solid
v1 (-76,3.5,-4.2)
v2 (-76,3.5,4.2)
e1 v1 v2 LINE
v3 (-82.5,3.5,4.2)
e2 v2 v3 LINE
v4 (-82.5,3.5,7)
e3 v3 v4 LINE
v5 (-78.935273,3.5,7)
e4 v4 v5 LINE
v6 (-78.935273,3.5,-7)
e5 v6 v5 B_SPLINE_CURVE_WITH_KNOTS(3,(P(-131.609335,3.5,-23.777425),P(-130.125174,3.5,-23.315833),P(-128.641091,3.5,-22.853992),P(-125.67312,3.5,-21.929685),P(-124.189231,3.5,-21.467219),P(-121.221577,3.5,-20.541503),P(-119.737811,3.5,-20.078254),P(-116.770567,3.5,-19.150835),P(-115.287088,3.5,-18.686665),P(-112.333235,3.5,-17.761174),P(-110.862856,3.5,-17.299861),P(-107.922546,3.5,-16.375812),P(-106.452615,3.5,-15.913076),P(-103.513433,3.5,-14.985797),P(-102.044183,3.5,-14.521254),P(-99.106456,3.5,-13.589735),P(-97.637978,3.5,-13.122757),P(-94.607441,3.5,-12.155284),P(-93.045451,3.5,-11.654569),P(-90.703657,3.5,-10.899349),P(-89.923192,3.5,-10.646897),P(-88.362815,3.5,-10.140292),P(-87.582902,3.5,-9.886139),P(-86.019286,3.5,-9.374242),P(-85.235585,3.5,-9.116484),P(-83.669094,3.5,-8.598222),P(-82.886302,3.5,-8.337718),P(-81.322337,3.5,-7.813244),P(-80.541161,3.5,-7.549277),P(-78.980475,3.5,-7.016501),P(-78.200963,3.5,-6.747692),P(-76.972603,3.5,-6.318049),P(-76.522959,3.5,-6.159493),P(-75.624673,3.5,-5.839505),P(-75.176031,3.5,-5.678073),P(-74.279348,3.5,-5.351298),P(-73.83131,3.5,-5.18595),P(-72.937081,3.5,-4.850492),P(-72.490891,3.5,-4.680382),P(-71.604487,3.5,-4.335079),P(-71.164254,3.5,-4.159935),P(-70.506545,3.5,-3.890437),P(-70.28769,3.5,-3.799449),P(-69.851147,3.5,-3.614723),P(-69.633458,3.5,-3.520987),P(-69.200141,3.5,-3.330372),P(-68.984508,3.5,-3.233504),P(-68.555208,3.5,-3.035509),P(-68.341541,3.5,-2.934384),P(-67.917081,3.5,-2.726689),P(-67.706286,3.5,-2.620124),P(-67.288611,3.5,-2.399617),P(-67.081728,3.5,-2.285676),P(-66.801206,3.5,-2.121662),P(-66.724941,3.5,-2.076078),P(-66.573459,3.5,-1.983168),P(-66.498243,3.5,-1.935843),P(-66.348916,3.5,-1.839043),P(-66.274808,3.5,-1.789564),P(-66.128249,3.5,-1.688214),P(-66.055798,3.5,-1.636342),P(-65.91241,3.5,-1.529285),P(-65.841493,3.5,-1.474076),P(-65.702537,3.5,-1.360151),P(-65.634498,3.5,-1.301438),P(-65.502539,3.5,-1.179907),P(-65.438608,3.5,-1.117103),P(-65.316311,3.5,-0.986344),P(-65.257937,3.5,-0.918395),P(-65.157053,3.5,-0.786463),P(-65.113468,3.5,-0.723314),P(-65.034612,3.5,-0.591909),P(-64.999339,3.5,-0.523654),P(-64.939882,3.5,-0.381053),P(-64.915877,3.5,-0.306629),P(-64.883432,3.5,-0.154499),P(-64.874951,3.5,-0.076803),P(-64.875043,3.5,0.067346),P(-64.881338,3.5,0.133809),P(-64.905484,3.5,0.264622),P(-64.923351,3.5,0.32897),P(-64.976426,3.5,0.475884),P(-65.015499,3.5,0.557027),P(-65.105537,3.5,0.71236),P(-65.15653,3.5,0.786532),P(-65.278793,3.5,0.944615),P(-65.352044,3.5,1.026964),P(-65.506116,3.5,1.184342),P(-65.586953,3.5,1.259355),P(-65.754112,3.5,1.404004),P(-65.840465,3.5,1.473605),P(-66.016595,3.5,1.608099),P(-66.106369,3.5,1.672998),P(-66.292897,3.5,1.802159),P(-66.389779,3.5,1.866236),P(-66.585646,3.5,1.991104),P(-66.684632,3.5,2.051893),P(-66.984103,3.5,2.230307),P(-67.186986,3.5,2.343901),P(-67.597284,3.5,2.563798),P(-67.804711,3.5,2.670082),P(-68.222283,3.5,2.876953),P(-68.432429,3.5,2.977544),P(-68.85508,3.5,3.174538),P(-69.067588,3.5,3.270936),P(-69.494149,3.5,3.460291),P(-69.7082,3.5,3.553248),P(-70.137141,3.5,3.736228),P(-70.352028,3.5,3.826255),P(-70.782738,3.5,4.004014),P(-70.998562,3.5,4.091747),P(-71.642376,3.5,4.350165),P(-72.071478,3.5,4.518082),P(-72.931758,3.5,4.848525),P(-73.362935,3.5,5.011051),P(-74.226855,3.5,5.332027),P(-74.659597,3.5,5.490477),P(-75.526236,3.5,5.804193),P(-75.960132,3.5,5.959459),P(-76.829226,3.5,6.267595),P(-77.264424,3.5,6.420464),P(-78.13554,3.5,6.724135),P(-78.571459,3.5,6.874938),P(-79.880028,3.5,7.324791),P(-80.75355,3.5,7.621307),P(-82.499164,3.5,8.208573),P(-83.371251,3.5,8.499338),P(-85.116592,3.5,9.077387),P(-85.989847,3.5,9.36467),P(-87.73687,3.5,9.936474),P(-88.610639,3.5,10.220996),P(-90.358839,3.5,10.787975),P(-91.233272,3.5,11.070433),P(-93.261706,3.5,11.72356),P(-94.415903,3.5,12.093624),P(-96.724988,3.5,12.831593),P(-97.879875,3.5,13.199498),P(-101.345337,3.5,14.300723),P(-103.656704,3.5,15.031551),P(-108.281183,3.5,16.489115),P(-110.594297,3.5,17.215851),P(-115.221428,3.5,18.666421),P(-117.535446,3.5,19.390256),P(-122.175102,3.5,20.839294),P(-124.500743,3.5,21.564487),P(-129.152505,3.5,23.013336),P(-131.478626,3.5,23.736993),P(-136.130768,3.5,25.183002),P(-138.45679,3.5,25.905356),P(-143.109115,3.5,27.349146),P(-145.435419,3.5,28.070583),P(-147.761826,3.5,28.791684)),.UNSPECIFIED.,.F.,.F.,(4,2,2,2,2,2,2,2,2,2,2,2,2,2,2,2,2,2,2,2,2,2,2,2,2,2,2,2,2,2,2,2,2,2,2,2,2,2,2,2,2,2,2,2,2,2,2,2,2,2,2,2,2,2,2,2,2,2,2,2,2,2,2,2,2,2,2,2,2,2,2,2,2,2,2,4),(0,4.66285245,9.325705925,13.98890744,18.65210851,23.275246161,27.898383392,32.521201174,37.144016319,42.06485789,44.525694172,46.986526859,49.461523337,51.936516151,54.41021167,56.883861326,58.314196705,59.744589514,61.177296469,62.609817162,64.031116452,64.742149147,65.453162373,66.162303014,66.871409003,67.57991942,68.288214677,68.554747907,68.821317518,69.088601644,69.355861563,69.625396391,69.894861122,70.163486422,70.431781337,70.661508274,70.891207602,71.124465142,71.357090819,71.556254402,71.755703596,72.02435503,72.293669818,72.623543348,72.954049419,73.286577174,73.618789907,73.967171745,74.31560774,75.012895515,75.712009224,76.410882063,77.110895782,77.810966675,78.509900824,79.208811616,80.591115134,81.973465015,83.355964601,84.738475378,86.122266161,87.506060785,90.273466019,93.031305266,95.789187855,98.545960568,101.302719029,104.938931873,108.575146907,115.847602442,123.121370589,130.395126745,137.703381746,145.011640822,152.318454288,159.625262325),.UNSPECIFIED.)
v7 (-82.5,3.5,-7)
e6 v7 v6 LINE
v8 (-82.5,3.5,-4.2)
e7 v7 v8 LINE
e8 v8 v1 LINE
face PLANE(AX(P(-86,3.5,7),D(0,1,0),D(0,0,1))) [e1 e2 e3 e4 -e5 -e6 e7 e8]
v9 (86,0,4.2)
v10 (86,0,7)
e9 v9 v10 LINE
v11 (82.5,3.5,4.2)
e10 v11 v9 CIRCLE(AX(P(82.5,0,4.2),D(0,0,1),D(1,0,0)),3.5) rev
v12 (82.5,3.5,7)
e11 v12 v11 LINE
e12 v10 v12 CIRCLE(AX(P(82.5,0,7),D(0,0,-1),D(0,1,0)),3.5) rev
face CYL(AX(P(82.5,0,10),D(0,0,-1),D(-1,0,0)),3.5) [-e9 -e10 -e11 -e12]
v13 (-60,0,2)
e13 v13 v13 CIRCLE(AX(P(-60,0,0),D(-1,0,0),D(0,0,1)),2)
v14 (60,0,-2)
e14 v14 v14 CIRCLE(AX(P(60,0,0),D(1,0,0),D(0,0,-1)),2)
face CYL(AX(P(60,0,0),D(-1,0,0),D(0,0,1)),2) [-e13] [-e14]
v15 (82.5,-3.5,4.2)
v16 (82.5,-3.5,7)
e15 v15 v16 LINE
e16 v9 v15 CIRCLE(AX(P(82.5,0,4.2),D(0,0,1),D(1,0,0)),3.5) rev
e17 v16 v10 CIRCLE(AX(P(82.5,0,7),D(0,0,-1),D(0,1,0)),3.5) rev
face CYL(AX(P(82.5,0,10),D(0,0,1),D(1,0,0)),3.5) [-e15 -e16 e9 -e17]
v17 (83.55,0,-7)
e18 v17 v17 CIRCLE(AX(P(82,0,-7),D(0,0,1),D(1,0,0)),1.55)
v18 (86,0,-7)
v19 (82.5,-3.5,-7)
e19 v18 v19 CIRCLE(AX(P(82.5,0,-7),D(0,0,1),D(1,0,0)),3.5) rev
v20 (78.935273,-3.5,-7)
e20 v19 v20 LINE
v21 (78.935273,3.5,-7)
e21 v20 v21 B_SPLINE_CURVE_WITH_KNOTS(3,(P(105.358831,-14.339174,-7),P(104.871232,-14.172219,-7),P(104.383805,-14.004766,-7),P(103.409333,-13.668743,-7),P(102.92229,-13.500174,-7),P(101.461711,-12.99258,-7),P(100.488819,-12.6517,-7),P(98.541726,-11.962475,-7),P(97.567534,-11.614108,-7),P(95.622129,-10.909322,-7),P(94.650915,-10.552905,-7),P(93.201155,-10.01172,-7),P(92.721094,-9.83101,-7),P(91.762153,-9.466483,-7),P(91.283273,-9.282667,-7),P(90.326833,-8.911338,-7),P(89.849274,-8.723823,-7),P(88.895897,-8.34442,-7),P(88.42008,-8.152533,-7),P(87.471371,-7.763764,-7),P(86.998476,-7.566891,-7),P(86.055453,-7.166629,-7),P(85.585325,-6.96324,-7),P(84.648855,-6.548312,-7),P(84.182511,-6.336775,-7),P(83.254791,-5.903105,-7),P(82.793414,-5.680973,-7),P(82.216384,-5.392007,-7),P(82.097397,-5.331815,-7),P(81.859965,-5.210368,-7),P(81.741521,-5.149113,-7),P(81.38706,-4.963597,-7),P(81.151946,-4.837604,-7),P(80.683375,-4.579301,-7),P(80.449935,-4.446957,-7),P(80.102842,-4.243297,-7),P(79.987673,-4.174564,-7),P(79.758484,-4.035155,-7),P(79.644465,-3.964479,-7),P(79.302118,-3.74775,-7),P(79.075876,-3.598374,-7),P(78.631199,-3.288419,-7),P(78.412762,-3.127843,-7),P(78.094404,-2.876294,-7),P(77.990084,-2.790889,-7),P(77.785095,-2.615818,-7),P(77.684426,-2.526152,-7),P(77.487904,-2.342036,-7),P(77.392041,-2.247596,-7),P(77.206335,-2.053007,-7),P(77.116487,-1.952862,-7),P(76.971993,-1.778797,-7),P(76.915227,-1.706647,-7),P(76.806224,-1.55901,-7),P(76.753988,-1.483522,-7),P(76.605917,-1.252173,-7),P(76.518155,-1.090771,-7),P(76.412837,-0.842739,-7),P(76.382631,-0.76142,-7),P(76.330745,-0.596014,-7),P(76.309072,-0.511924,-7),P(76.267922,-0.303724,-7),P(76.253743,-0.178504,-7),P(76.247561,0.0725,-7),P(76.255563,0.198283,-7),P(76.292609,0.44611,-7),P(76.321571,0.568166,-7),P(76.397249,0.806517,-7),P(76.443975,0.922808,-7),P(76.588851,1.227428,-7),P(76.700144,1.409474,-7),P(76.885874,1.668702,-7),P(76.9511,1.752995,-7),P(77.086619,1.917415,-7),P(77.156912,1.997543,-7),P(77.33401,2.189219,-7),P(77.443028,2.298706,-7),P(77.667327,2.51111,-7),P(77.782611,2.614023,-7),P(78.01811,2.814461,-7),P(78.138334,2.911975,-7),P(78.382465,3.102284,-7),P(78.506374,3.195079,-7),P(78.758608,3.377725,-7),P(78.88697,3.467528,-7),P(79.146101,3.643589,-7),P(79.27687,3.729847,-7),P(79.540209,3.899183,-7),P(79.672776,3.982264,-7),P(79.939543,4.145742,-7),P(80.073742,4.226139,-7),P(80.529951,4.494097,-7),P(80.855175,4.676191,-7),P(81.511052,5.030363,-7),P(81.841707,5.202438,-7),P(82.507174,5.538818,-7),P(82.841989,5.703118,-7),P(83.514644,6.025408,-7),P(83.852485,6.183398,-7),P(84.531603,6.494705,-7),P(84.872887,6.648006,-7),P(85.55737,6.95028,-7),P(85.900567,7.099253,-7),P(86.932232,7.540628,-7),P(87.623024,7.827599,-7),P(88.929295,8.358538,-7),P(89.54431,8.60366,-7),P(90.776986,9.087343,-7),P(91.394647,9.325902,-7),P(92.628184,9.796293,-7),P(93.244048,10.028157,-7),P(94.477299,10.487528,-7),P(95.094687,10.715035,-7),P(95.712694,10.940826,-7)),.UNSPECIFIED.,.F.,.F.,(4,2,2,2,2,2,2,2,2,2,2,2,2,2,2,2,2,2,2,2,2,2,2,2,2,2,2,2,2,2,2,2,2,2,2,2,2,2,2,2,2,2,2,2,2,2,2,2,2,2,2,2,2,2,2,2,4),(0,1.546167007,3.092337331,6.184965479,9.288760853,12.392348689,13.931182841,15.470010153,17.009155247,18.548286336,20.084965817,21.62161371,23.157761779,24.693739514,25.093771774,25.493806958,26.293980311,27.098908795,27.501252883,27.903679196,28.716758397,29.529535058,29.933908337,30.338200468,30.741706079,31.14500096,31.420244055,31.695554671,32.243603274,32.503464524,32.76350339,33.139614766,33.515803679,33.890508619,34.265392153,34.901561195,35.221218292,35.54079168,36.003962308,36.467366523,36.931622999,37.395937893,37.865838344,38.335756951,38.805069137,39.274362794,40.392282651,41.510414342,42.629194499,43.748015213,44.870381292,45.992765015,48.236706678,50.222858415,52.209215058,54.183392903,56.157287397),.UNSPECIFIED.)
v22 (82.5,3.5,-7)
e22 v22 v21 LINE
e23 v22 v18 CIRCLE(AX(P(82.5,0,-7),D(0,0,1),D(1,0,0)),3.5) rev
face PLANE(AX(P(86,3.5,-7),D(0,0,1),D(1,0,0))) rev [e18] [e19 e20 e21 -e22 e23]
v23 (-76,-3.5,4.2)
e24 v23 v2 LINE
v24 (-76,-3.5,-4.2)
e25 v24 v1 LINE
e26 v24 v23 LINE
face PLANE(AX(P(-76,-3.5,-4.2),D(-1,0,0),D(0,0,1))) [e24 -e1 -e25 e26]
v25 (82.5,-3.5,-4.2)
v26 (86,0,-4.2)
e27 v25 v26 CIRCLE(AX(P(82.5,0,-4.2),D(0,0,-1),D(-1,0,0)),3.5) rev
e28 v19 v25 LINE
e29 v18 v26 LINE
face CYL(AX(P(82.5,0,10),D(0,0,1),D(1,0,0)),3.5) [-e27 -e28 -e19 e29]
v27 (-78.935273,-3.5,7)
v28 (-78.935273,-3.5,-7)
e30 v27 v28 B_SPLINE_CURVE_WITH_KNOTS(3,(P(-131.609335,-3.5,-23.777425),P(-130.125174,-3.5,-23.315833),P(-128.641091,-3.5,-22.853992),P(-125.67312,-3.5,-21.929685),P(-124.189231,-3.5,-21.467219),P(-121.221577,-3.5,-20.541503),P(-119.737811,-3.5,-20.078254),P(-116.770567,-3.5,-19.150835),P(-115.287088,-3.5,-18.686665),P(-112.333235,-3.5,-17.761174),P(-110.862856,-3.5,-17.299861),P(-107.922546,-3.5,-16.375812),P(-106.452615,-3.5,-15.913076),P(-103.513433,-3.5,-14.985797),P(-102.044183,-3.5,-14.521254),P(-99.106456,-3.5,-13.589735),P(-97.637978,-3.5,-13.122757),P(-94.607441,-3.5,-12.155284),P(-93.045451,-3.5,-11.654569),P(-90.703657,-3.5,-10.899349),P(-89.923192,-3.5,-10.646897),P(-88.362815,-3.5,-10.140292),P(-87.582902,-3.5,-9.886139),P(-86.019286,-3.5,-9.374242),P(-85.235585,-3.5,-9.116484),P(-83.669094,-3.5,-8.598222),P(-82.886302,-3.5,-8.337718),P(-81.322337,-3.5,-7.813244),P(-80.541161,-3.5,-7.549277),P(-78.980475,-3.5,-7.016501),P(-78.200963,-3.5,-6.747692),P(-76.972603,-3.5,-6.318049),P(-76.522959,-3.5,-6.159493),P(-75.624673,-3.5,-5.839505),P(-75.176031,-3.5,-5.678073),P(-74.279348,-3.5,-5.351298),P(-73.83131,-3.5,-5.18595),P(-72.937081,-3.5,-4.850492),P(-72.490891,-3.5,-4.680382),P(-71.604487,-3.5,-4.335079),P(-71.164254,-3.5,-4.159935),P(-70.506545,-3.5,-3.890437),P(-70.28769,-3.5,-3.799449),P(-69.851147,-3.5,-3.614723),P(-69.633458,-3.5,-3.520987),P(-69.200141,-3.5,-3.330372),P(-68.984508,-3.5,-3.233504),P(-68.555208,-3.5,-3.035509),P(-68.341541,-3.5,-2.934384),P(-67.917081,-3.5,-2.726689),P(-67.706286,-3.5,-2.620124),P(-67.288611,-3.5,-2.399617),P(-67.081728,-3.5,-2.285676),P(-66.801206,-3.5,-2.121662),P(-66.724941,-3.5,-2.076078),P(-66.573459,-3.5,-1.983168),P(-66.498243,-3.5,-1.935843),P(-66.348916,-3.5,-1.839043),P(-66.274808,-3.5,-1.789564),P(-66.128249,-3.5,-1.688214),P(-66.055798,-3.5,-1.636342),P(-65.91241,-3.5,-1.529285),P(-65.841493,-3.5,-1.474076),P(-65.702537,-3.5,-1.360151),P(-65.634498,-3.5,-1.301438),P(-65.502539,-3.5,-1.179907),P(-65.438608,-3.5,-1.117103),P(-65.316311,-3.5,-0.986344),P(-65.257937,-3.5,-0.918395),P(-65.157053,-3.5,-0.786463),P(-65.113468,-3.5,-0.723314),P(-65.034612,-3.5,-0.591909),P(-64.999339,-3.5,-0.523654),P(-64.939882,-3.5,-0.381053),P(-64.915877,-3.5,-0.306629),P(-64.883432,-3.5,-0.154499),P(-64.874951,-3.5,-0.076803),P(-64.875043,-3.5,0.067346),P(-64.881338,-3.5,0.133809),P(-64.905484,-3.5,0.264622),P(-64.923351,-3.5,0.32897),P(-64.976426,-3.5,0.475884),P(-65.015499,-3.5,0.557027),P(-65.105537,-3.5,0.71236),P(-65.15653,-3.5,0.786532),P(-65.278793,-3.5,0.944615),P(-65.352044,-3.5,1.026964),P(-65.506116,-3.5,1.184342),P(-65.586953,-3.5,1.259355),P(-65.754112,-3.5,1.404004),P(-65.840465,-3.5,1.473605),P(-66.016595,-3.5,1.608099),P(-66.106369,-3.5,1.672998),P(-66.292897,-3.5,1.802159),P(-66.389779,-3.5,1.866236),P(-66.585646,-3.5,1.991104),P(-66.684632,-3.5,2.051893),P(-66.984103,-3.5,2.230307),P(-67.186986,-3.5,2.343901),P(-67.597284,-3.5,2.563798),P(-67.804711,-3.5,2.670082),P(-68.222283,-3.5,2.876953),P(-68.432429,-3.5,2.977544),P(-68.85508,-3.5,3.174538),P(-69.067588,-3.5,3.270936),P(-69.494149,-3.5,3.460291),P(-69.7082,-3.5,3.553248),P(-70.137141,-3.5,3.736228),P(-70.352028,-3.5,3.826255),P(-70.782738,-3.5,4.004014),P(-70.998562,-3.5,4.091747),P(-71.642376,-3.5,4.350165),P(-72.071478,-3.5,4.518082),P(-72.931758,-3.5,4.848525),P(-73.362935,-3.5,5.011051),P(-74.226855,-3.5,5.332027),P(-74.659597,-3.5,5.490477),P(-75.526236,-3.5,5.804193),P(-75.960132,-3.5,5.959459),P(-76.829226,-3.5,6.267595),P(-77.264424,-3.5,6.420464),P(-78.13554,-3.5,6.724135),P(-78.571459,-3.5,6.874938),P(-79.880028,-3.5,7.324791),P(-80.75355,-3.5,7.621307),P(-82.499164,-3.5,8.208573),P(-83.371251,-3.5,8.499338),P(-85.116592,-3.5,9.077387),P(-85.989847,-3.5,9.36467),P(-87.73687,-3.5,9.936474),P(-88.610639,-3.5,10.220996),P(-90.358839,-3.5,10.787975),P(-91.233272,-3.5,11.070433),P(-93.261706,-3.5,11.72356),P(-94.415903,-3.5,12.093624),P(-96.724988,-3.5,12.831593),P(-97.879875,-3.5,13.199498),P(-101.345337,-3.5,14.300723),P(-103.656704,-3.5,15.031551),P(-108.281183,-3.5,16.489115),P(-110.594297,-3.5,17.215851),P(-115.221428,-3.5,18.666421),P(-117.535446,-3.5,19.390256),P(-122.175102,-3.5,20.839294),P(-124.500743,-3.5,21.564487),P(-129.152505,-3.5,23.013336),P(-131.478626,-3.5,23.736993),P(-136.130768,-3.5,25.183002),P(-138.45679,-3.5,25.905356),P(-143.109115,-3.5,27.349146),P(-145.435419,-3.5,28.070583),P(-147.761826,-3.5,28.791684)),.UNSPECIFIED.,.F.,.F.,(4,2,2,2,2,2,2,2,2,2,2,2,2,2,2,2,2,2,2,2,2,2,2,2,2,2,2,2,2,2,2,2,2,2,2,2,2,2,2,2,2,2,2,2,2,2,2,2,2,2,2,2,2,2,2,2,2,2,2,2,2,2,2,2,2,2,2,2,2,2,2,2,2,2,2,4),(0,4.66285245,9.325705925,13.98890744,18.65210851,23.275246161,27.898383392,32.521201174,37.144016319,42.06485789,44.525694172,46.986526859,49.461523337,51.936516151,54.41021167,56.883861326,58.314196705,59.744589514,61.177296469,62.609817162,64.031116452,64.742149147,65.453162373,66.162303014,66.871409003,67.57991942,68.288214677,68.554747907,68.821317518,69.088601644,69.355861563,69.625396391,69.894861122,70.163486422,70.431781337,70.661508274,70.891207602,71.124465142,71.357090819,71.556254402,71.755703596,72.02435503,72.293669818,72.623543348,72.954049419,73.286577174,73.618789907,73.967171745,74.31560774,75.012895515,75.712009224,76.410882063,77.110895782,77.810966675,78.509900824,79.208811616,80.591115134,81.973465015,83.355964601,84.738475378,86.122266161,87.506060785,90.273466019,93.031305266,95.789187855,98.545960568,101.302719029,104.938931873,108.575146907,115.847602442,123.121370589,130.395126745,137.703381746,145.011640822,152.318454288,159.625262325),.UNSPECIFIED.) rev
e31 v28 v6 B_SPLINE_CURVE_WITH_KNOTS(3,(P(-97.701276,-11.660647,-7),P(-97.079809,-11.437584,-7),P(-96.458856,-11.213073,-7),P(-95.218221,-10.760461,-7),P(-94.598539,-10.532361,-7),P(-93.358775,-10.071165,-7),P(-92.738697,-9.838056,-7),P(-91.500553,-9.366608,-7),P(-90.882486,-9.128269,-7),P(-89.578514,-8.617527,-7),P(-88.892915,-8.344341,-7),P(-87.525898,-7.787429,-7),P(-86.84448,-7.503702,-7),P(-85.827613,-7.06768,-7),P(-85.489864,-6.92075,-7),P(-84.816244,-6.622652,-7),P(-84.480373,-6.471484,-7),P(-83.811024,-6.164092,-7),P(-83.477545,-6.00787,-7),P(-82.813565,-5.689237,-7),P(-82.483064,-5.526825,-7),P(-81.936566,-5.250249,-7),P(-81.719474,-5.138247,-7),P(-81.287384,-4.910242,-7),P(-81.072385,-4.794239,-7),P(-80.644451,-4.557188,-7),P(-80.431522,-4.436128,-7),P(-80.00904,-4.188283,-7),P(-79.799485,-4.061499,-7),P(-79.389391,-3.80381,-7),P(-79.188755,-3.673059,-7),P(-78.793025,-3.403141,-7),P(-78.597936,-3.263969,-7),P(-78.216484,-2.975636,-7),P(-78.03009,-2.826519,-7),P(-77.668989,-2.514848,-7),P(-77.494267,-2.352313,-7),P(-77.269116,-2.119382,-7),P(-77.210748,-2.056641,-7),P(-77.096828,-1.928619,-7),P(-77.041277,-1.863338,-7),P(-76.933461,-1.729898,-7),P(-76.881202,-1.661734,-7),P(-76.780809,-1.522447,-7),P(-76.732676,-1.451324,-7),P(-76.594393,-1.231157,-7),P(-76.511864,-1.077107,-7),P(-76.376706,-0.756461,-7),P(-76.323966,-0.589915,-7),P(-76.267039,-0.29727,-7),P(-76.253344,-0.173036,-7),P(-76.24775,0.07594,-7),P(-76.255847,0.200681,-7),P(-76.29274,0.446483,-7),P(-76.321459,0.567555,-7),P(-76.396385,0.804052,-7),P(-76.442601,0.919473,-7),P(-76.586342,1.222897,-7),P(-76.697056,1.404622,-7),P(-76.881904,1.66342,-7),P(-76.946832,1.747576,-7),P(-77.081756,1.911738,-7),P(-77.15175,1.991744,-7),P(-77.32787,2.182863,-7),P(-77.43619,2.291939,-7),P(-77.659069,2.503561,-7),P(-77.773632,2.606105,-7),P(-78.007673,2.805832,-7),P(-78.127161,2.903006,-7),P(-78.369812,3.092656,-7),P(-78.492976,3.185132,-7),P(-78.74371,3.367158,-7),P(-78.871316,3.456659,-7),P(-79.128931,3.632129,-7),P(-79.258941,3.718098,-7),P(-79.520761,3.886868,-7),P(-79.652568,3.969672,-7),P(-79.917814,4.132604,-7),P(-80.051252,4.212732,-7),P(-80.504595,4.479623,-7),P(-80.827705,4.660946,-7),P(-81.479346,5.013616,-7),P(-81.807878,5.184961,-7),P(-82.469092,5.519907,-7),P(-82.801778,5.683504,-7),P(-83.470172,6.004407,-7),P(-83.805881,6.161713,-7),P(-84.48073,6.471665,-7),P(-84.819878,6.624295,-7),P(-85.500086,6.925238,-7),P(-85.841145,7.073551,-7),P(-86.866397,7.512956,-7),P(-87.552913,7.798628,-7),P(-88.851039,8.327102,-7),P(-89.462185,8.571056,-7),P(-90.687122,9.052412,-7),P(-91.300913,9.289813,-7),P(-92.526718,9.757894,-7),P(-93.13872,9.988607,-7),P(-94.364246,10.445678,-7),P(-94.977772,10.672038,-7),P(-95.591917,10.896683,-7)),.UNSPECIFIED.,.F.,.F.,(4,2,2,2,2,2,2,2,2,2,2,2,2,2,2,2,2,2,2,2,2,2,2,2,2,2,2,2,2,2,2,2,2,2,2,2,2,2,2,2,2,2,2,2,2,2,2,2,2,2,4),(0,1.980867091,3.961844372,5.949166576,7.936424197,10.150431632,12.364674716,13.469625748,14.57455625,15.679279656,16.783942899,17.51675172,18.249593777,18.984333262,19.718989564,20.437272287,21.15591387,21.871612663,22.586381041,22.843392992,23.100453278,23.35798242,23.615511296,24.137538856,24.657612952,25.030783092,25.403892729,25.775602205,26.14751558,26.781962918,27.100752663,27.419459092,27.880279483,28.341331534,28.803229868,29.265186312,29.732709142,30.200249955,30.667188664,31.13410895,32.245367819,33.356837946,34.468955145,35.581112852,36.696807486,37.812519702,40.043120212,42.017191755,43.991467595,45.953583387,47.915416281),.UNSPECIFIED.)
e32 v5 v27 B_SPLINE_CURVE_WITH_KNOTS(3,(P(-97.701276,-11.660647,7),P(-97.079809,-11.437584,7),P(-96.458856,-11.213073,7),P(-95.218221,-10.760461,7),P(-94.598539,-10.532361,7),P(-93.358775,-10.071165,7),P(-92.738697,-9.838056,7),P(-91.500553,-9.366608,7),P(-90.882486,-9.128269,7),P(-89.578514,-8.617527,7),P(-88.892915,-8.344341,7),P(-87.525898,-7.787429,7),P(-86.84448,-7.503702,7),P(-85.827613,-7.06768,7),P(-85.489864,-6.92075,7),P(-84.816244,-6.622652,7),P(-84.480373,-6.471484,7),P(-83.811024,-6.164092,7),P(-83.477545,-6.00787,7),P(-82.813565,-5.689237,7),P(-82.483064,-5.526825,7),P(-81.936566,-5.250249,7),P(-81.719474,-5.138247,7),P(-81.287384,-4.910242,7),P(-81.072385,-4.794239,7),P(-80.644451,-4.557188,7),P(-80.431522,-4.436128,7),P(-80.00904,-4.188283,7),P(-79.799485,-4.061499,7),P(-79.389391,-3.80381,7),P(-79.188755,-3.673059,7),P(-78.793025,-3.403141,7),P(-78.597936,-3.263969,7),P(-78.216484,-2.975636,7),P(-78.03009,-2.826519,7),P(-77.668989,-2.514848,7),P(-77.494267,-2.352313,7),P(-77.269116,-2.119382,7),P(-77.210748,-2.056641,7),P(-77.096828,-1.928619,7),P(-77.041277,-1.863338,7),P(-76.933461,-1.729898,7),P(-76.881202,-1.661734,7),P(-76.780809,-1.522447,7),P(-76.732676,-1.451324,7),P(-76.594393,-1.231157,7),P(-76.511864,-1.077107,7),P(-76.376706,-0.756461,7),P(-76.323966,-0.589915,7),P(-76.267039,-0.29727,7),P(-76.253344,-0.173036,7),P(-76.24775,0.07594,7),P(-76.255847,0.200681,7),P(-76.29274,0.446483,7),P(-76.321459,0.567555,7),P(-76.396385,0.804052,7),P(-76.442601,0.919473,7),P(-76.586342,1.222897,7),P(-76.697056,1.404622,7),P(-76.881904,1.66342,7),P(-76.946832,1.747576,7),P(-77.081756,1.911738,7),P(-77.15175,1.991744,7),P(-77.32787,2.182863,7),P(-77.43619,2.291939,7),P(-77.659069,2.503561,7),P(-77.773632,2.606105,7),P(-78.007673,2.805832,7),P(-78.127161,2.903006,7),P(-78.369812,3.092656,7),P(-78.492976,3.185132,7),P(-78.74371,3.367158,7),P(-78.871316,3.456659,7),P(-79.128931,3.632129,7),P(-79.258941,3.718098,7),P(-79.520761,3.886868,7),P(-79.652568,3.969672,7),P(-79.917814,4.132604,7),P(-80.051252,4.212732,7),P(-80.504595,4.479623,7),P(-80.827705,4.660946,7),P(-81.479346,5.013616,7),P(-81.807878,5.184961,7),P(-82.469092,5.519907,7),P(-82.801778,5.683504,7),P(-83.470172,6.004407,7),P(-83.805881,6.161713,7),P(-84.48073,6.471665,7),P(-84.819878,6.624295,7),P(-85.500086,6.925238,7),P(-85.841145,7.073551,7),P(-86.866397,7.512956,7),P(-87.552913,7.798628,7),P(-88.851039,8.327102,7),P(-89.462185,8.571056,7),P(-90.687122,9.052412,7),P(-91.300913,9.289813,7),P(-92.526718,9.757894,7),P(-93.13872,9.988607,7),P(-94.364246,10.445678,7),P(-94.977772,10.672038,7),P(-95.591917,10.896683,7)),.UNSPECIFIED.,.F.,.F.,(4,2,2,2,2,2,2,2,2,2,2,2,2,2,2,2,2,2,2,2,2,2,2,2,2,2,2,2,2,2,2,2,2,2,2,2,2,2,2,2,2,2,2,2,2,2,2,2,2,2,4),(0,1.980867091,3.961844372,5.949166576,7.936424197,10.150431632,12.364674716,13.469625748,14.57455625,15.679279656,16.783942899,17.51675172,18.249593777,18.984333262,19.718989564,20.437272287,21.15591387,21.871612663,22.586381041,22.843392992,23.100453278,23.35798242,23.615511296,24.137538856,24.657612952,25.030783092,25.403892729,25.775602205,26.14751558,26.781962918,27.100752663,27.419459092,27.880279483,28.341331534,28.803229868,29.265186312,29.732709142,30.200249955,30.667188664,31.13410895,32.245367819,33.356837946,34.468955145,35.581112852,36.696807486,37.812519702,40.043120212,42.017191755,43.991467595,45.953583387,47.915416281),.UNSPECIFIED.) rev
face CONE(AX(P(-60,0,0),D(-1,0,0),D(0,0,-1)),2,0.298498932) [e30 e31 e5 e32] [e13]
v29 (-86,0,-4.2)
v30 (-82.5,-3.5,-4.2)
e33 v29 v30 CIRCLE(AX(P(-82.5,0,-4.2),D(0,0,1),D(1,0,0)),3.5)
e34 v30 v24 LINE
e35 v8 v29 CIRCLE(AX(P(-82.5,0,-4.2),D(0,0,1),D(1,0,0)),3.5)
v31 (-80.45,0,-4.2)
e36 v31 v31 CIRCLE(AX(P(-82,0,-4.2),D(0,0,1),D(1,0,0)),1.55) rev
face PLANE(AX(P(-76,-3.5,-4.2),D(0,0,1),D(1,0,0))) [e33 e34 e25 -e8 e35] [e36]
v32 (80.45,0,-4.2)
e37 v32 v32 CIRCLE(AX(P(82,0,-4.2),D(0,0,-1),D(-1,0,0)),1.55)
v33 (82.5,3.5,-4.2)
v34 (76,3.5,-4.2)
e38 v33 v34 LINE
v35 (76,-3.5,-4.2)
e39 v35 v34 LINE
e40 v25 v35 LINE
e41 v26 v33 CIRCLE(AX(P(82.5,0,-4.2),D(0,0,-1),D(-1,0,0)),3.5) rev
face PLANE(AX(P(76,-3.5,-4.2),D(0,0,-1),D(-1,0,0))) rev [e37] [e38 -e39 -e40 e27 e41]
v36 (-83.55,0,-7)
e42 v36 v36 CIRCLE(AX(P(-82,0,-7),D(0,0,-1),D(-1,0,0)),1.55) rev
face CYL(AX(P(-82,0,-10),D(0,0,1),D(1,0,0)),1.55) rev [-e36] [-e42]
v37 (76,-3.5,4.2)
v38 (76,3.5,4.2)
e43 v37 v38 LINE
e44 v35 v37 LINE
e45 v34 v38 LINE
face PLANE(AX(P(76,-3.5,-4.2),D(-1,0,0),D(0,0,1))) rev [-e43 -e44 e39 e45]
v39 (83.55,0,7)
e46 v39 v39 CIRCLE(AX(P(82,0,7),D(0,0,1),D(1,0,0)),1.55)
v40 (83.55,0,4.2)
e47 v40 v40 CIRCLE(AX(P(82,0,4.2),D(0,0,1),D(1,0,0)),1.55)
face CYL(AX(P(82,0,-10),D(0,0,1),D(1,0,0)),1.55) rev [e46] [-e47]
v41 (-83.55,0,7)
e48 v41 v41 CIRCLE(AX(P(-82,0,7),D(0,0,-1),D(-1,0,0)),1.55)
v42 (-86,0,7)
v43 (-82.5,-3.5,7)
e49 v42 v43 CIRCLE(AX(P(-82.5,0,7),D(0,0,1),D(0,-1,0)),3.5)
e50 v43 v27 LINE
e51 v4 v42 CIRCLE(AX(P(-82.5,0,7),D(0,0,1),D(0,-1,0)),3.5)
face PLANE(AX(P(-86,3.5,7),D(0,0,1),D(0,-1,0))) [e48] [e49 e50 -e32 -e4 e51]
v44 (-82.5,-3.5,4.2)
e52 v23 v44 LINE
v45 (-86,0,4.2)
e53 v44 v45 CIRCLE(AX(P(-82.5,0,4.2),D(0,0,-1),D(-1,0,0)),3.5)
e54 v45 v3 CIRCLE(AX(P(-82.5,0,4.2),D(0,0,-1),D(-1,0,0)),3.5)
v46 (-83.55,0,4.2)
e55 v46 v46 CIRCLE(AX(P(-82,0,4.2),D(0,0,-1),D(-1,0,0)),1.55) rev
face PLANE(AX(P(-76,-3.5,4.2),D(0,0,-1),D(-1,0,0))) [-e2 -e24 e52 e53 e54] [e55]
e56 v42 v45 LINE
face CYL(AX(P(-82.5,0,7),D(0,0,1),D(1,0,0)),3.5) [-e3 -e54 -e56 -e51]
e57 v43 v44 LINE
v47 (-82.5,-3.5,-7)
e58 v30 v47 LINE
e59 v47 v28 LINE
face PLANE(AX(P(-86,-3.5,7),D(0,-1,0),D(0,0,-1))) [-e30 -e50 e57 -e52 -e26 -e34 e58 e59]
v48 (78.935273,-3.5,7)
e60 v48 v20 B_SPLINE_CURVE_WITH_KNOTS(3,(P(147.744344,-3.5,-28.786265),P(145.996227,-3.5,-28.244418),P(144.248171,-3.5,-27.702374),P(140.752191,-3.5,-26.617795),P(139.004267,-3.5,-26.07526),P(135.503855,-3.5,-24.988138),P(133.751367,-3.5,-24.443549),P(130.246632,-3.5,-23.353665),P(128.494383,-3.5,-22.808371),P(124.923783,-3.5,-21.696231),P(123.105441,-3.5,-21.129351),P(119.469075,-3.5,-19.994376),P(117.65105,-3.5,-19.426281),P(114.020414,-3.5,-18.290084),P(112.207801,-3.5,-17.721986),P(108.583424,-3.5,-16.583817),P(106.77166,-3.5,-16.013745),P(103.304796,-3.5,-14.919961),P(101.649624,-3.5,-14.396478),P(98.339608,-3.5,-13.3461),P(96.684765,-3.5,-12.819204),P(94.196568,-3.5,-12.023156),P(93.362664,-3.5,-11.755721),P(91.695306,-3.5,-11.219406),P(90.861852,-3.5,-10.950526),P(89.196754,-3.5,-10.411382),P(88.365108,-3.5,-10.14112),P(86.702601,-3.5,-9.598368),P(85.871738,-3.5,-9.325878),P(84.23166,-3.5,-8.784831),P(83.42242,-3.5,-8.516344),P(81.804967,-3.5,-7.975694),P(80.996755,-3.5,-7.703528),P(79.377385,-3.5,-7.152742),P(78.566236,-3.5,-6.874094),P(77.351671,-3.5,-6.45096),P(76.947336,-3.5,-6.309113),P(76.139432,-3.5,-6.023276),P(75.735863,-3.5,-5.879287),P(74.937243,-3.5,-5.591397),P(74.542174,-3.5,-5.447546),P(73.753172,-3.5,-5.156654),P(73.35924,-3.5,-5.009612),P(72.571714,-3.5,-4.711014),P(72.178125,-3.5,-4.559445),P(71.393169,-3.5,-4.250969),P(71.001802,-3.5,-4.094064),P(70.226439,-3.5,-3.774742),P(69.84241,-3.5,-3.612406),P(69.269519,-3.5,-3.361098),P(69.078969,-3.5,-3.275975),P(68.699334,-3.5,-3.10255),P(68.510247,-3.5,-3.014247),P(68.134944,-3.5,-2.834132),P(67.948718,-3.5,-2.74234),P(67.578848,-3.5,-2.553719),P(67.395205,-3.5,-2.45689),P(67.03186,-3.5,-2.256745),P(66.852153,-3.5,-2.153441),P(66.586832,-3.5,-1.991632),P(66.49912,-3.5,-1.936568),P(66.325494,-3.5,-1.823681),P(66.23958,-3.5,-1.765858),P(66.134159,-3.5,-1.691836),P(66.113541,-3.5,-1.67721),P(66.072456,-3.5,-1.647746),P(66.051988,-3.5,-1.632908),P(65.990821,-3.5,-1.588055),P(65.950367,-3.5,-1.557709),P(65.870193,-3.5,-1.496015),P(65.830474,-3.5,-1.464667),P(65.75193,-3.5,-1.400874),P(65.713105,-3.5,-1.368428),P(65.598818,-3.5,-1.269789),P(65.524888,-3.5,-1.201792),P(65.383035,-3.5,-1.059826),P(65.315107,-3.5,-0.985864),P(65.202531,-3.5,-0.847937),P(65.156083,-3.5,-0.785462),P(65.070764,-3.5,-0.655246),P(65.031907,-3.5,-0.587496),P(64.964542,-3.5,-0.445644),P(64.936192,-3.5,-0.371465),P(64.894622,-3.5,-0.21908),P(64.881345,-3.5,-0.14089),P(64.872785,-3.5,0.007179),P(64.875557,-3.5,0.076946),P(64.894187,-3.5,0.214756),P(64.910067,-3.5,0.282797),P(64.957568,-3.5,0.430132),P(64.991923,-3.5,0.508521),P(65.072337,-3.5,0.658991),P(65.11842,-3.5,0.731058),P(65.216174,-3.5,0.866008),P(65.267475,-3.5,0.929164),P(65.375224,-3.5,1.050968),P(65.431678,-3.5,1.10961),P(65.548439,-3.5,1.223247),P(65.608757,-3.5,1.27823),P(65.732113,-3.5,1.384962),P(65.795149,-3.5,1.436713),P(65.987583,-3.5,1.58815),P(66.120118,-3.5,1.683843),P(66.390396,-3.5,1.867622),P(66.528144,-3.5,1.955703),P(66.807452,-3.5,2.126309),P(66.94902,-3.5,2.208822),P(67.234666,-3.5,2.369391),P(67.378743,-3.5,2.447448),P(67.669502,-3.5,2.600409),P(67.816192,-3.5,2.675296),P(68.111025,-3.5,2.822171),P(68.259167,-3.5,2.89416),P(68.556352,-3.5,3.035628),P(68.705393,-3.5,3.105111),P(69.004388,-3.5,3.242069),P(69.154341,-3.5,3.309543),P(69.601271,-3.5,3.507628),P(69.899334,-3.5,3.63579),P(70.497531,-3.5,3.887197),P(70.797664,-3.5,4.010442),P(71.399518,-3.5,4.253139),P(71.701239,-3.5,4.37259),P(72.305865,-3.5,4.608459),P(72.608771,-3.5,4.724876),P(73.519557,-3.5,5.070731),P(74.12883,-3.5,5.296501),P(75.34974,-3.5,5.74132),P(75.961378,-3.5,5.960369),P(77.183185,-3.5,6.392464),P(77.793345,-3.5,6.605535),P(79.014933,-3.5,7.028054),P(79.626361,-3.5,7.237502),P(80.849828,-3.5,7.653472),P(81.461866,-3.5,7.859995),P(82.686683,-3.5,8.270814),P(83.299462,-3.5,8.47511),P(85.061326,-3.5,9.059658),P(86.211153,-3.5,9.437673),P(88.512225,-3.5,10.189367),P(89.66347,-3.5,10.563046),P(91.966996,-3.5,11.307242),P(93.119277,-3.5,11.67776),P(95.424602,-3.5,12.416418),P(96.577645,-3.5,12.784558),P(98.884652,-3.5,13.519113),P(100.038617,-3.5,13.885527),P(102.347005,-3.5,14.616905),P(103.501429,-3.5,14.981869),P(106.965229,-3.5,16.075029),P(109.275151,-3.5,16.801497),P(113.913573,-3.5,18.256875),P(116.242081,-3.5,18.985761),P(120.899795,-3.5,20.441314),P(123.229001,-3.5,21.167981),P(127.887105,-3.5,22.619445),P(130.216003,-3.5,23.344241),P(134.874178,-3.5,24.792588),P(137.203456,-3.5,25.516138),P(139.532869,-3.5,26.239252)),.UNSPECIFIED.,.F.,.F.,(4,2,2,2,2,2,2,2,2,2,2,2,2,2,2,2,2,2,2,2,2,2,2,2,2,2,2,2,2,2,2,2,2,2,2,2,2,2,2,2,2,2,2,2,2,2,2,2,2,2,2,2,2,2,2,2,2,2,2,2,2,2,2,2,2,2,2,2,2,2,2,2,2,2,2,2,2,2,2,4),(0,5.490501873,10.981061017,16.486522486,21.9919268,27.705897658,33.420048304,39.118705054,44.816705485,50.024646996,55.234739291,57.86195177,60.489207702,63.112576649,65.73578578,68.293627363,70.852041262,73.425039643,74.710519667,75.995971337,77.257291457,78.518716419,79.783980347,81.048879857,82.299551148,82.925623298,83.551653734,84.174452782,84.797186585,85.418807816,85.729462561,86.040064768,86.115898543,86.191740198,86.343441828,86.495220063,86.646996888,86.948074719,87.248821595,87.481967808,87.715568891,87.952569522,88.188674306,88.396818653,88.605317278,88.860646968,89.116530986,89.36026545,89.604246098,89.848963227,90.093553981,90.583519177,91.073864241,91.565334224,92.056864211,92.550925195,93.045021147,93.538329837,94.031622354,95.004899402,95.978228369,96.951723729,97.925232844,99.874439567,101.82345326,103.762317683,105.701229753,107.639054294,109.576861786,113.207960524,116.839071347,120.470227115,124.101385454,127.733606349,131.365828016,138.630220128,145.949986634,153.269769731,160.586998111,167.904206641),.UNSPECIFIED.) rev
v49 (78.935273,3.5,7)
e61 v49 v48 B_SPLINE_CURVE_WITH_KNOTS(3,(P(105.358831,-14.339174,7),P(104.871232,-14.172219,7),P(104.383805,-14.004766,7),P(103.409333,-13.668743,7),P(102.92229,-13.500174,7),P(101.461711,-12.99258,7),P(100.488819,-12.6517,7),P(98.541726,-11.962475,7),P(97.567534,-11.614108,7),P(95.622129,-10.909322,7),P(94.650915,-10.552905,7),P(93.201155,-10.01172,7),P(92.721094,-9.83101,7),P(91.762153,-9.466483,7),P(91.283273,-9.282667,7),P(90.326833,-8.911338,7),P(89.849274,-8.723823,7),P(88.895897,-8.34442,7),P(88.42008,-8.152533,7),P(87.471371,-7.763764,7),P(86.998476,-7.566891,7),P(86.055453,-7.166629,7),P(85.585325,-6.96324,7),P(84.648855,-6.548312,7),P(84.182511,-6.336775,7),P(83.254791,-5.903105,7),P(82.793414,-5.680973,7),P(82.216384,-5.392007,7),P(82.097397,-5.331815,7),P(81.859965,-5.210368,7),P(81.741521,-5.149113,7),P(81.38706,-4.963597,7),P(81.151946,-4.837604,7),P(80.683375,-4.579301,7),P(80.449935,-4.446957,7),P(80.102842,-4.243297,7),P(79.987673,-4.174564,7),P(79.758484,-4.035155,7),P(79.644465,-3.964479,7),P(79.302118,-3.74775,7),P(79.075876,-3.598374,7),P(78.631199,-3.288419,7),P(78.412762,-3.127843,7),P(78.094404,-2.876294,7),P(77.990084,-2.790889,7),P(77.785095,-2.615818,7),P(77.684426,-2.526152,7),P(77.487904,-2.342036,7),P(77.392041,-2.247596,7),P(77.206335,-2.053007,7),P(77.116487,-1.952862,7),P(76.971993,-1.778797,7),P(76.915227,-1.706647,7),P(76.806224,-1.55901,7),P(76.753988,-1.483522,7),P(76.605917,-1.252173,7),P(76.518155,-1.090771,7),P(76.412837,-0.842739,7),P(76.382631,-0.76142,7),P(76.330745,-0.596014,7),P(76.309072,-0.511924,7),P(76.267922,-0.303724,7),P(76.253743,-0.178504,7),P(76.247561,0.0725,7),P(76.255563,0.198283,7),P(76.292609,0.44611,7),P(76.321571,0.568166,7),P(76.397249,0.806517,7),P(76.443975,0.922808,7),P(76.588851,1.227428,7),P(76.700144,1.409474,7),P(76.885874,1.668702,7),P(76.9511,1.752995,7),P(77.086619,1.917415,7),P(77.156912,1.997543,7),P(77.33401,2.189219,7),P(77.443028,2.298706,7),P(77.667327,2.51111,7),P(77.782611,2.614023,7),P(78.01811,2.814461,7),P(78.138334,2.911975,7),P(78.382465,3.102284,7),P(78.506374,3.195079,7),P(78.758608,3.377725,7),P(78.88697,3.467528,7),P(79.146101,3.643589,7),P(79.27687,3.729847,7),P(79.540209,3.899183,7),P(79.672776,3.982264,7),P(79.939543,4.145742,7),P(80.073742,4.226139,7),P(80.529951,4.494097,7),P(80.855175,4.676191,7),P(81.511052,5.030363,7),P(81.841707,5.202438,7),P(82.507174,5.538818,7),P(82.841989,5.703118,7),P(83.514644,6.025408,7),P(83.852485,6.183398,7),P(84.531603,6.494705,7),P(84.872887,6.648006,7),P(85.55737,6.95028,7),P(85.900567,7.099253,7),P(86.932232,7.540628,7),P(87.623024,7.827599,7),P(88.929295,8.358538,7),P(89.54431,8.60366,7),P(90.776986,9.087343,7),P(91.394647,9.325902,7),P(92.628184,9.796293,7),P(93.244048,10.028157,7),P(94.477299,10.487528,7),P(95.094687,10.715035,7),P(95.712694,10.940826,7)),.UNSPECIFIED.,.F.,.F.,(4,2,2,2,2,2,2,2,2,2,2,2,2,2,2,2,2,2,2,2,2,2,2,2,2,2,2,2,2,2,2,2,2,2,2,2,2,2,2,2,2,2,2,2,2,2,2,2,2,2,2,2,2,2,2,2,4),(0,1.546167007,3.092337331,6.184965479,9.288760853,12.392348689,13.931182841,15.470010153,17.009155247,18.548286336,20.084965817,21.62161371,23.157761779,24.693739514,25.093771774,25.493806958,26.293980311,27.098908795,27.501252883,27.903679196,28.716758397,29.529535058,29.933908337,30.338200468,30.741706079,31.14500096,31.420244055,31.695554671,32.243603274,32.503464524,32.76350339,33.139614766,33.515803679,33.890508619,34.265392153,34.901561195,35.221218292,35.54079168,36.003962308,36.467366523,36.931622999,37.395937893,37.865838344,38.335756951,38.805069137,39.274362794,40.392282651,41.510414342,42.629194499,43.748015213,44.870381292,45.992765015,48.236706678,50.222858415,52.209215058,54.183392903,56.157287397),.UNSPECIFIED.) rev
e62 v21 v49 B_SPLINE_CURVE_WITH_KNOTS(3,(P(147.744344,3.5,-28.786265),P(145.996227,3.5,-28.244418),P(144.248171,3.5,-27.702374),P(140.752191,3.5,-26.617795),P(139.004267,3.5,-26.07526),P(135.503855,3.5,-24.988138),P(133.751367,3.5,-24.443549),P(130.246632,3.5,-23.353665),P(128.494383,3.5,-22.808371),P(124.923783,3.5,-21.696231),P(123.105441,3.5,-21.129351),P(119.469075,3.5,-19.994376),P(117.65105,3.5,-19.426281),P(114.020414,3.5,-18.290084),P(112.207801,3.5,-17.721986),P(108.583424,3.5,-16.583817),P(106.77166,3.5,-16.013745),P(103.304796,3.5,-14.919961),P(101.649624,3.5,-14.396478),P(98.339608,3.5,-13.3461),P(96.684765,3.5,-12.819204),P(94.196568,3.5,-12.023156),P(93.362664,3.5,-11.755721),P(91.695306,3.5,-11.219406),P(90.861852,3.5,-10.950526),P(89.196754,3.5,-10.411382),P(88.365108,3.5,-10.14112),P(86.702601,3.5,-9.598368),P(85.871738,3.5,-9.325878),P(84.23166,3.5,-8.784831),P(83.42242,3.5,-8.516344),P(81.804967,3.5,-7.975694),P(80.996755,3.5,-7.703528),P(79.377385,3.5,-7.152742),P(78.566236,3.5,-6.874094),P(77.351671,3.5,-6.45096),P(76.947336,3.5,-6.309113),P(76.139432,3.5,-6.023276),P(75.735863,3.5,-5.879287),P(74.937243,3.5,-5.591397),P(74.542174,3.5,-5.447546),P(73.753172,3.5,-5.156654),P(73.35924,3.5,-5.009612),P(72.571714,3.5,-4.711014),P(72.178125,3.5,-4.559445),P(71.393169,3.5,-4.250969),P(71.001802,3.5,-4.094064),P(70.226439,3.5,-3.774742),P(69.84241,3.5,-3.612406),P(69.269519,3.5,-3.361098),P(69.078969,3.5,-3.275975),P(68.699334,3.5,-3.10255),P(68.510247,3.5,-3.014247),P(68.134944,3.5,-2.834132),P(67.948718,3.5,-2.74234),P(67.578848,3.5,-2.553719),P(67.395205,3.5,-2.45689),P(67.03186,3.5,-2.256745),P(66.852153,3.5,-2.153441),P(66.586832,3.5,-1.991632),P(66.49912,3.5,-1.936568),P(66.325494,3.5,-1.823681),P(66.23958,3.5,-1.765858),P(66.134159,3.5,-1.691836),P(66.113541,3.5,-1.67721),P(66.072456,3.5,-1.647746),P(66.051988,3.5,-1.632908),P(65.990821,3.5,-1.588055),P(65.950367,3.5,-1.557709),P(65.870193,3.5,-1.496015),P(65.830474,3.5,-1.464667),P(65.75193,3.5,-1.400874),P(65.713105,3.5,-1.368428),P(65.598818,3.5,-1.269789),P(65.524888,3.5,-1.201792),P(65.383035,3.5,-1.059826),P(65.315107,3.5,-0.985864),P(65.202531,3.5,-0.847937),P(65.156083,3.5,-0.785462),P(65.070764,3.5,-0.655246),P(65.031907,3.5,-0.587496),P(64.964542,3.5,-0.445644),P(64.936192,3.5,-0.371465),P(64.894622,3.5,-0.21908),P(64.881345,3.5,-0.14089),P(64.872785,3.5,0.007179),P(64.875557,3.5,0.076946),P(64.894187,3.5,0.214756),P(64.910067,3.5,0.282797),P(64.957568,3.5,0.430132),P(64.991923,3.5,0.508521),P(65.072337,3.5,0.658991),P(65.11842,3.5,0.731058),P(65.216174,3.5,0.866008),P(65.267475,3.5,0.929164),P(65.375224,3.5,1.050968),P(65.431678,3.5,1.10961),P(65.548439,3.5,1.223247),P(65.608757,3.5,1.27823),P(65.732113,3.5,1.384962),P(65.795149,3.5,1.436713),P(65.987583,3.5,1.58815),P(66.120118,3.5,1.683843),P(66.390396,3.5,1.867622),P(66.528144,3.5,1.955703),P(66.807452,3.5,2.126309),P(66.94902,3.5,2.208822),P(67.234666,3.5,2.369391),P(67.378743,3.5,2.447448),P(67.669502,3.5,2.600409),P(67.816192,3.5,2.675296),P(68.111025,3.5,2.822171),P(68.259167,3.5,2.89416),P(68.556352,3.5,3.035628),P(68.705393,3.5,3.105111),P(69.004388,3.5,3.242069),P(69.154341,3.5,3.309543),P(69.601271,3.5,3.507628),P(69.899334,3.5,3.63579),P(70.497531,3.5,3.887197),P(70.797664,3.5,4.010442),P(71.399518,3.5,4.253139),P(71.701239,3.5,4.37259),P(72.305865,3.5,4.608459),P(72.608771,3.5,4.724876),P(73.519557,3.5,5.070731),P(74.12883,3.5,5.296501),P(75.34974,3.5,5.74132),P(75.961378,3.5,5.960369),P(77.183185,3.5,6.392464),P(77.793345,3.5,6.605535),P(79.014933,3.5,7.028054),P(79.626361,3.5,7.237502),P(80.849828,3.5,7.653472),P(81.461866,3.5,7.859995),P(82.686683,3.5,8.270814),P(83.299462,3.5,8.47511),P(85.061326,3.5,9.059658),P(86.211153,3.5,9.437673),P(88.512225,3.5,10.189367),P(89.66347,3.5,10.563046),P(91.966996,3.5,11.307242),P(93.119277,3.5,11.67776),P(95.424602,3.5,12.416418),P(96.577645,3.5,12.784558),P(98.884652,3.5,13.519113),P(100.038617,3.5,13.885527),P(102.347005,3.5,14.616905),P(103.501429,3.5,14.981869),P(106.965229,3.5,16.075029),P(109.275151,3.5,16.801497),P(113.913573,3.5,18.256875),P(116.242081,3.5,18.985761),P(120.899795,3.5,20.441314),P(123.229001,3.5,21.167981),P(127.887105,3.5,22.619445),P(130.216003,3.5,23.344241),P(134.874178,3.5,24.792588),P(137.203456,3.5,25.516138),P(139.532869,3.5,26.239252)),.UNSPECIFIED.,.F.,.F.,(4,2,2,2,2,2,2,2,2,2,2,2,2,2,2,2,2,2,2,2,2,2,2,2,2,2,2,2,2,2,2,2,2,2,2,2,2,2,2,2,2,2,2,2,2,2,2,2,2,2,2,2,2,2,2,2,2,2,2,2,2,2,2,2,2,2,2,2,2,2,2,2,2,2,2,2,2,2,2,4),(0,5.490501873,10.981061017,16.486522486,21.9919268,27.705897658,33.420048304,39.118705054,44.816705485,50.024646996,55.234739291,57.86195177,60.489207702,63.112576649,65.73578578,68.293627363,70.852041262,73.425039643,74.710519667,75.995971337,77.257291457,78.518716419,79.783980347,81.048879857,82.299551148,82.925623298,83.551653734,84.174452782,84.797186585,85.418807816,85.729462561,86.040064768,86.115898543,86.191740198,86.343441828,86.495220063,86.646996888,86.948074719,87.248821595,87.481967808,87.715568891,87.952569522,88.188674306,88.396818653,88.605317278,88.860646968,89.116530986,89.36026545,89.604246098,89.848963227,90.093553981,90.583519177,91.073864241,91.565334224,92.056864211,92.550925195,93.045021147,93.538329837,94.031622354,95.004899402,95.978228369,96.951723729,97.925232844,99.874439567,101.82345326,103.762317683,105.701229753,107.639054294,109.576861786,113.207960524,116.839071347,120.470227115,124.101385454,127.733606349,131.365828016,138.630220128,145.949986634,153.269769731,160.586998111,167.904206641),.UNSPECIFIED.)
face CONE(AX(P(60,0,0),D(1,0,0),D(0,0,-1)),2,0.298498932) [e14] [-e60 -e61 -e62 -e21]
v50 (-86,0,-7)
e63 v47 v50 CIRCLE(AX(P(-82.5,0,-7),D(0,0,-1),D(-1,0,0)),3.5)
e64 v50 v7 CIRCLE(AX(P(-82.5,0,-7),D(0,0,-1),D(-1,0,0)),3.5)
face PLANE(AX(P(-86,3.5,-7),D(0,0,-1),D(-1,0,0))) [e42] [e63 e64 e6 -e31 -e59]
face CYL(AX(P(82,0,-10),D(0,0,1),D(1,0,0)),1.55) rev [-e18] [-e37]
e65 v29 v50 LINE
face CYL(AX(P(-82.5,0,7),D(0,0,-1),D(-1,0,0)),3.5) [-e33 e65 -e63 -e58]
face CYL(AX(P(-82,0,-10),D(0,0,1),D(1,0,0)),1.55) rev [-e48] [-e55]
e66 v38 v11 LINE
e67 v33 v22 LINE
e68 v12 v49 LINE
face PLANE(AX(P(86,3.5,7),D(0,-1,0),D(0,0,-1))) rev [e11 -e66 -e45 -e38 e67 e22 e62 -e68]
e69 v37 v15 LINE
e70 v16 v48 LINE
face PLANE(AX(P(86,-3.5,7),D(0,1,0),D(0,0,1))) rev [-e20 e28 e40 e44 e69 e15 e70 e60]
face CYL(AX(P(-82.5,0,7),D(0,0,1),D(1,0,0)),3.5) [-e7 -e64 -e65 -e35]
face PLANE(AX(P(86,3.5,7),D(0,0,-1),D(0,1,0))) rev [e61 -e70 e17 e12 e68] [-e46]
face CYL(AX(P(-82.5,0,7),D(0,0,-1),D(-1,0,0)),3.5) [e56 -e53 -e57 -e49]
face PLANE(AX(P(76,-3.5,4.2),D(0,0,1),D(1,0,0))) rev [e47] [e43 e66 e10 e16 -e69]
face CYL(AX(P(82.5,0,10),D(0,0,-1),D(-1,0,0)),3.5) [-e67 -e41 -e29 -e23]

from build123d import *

# Parameters (mm, degrees)
SKETCH1_R            = 2
BOSS_EXTRUDE1_DEPTH  = 60
SKETCH3_R            = 10
SKETCH3_W            = 14
SKETCH3_H            = 7
CUT_EXTRUDE1_DEPTH   = 121.830459736
SKETCH4_W            = 10
SKETCH4_H            = 8.4
CUT_EXTRUDE2_DEPTH   = 87.567892431
SKETCH5_R            = 1.55
CUT_EXTRUDE3_DEPTH   = 88.202350886
FILLET1_R            = 3.5
FILLET1_OF_MIRROR1_R = 3.5


with BuildPart() as part:
    # Sketch1 → Boss-Extrude1 (new, symmetric)
    with BuildSketch(Plane(origin=(0, 0, 0), x_dir=(0, 0, -1), z_dir=(1, 0, 0))):
        Circle(SKETCH1_R)
    extrude(amount=BOSS_EXTRUDE1_DEPTH, both=True)

    # Sketch2 → Revolve2 (revolve)
    with BuildSketch(Plane(origin=(0, 0, 0), x_dir=(1, 0, 0), z_dir=(0, 1, 0)), mode=Mode.PRIVATE) as revolve2_sk:
        Polygon((60, -2), (86, -10), (86, 0), (60, 0), align=None)
    revolve2 = revolve(revolve2_sk.sketch.rotate(Axis((-1000, 0, 0), (1, 0, 0)), 180), axis=Axis((-1000, 0, 0), (1, 0, 0)))

    # Sketch3 → Cut-Extrude1 (cut, through all)
    with BuildSketch(Plane(origin=(60, 0, 0), x_dir=(0, 0, -1), z_dir=(1, 0, 0))):
        Circle(SKETCH3_R)
        Rectangle(SKETCH3_W, SKETCH3_H, mode=Mode.SUBTRACT)
    cut_extrude1 = extrude(amount=CUT_EXTRUDE1_DEPTH, mode=Mode.SUBTRACT)

    # Sketch4 → Cut-Extrude2 (cut, through all)
    with BuildSketch(Plane(origin=(0, 3.5, 0), x_dir=(1, 0, 0), z_dir=(0, 1, 0))):
        with Locations((81, 0)):
            Rectangle(SKETCH4_W, SKETCH4_H)
    cut_extrude2 = extrude(amount=-CUT_EXTRUDE2_DEPTH, mode=Mode.SUBTRACT)

    # Sketch5 → Cut-Extrude3 (cut, through all)
    with BuildSketch(Plane.XY.offset(7)):
        with Locations((82, 0)):
            Circle(SKETCH5_R)
    cut_extrude3 = extrude(amount=-CUT_EXTRUDE3_DEPTH, mode=Mode.SUBTRACT)

    # Fillet1
    fillet1_edges = [part.edges().sort_by_distance(p)[0] for p in [
        (86, -3.5, -5.6),
        (86, 3.5, -5.6),
        (86, -3.5, 5.6),
        (86, 3.5, 5.6),
    ]]
    fillet(fillet1_edges, radius=FILLET1_R - 0.0001)  # a hair under: the kernel refuses the full size

    # Mirror1: Revolve2, Cut-Extrude1, Cut-Extrude2, Cut-Extrude3 across plane
    add(revolve2.mirror(Plane(origin=(0, 0, 0), x_dir=(0, 0, 1), z_dir=(1, 0, 0))))
    add(cut_extrude1.mirror(Plane(origin=(0, 0, 0), x_dir=(0, 0, 1), z_dir=(1, 0, 0))), mode=Mode.SUBTRACT)
    add(cut_extrude2.mirror(Plane(origin=(0, 0, 0), x_dir=(0, 0, 1), z_dir=(1, 0, 0))), mode=Mode.SUBTRACT)
    add(cut_extrude3.mirror(Plane(origin=(0, 0, 0), x_dir=(0, 0, 1), z_dir=(1, 0, 0))), mode=Mode.SUBTRACT)

    # Fillet1 of Mirror1
    fillet1_of_mirror1_edges = [part.edges().sort_by_distance(p)[0] for p in [
        (-86, -3.5, -5.6),
        (-86, 3.5, -5.6),
        (-86, -3.5, 5.6),
        (-86, 3.5, 5.6),
    ]]
    fillet(fillet1_of_mirror1_edges, radius=FILLET1_OF_MIRROR1_R - 0.0001)  # a hair under: the kernel refuses the full size


solid = part.part
